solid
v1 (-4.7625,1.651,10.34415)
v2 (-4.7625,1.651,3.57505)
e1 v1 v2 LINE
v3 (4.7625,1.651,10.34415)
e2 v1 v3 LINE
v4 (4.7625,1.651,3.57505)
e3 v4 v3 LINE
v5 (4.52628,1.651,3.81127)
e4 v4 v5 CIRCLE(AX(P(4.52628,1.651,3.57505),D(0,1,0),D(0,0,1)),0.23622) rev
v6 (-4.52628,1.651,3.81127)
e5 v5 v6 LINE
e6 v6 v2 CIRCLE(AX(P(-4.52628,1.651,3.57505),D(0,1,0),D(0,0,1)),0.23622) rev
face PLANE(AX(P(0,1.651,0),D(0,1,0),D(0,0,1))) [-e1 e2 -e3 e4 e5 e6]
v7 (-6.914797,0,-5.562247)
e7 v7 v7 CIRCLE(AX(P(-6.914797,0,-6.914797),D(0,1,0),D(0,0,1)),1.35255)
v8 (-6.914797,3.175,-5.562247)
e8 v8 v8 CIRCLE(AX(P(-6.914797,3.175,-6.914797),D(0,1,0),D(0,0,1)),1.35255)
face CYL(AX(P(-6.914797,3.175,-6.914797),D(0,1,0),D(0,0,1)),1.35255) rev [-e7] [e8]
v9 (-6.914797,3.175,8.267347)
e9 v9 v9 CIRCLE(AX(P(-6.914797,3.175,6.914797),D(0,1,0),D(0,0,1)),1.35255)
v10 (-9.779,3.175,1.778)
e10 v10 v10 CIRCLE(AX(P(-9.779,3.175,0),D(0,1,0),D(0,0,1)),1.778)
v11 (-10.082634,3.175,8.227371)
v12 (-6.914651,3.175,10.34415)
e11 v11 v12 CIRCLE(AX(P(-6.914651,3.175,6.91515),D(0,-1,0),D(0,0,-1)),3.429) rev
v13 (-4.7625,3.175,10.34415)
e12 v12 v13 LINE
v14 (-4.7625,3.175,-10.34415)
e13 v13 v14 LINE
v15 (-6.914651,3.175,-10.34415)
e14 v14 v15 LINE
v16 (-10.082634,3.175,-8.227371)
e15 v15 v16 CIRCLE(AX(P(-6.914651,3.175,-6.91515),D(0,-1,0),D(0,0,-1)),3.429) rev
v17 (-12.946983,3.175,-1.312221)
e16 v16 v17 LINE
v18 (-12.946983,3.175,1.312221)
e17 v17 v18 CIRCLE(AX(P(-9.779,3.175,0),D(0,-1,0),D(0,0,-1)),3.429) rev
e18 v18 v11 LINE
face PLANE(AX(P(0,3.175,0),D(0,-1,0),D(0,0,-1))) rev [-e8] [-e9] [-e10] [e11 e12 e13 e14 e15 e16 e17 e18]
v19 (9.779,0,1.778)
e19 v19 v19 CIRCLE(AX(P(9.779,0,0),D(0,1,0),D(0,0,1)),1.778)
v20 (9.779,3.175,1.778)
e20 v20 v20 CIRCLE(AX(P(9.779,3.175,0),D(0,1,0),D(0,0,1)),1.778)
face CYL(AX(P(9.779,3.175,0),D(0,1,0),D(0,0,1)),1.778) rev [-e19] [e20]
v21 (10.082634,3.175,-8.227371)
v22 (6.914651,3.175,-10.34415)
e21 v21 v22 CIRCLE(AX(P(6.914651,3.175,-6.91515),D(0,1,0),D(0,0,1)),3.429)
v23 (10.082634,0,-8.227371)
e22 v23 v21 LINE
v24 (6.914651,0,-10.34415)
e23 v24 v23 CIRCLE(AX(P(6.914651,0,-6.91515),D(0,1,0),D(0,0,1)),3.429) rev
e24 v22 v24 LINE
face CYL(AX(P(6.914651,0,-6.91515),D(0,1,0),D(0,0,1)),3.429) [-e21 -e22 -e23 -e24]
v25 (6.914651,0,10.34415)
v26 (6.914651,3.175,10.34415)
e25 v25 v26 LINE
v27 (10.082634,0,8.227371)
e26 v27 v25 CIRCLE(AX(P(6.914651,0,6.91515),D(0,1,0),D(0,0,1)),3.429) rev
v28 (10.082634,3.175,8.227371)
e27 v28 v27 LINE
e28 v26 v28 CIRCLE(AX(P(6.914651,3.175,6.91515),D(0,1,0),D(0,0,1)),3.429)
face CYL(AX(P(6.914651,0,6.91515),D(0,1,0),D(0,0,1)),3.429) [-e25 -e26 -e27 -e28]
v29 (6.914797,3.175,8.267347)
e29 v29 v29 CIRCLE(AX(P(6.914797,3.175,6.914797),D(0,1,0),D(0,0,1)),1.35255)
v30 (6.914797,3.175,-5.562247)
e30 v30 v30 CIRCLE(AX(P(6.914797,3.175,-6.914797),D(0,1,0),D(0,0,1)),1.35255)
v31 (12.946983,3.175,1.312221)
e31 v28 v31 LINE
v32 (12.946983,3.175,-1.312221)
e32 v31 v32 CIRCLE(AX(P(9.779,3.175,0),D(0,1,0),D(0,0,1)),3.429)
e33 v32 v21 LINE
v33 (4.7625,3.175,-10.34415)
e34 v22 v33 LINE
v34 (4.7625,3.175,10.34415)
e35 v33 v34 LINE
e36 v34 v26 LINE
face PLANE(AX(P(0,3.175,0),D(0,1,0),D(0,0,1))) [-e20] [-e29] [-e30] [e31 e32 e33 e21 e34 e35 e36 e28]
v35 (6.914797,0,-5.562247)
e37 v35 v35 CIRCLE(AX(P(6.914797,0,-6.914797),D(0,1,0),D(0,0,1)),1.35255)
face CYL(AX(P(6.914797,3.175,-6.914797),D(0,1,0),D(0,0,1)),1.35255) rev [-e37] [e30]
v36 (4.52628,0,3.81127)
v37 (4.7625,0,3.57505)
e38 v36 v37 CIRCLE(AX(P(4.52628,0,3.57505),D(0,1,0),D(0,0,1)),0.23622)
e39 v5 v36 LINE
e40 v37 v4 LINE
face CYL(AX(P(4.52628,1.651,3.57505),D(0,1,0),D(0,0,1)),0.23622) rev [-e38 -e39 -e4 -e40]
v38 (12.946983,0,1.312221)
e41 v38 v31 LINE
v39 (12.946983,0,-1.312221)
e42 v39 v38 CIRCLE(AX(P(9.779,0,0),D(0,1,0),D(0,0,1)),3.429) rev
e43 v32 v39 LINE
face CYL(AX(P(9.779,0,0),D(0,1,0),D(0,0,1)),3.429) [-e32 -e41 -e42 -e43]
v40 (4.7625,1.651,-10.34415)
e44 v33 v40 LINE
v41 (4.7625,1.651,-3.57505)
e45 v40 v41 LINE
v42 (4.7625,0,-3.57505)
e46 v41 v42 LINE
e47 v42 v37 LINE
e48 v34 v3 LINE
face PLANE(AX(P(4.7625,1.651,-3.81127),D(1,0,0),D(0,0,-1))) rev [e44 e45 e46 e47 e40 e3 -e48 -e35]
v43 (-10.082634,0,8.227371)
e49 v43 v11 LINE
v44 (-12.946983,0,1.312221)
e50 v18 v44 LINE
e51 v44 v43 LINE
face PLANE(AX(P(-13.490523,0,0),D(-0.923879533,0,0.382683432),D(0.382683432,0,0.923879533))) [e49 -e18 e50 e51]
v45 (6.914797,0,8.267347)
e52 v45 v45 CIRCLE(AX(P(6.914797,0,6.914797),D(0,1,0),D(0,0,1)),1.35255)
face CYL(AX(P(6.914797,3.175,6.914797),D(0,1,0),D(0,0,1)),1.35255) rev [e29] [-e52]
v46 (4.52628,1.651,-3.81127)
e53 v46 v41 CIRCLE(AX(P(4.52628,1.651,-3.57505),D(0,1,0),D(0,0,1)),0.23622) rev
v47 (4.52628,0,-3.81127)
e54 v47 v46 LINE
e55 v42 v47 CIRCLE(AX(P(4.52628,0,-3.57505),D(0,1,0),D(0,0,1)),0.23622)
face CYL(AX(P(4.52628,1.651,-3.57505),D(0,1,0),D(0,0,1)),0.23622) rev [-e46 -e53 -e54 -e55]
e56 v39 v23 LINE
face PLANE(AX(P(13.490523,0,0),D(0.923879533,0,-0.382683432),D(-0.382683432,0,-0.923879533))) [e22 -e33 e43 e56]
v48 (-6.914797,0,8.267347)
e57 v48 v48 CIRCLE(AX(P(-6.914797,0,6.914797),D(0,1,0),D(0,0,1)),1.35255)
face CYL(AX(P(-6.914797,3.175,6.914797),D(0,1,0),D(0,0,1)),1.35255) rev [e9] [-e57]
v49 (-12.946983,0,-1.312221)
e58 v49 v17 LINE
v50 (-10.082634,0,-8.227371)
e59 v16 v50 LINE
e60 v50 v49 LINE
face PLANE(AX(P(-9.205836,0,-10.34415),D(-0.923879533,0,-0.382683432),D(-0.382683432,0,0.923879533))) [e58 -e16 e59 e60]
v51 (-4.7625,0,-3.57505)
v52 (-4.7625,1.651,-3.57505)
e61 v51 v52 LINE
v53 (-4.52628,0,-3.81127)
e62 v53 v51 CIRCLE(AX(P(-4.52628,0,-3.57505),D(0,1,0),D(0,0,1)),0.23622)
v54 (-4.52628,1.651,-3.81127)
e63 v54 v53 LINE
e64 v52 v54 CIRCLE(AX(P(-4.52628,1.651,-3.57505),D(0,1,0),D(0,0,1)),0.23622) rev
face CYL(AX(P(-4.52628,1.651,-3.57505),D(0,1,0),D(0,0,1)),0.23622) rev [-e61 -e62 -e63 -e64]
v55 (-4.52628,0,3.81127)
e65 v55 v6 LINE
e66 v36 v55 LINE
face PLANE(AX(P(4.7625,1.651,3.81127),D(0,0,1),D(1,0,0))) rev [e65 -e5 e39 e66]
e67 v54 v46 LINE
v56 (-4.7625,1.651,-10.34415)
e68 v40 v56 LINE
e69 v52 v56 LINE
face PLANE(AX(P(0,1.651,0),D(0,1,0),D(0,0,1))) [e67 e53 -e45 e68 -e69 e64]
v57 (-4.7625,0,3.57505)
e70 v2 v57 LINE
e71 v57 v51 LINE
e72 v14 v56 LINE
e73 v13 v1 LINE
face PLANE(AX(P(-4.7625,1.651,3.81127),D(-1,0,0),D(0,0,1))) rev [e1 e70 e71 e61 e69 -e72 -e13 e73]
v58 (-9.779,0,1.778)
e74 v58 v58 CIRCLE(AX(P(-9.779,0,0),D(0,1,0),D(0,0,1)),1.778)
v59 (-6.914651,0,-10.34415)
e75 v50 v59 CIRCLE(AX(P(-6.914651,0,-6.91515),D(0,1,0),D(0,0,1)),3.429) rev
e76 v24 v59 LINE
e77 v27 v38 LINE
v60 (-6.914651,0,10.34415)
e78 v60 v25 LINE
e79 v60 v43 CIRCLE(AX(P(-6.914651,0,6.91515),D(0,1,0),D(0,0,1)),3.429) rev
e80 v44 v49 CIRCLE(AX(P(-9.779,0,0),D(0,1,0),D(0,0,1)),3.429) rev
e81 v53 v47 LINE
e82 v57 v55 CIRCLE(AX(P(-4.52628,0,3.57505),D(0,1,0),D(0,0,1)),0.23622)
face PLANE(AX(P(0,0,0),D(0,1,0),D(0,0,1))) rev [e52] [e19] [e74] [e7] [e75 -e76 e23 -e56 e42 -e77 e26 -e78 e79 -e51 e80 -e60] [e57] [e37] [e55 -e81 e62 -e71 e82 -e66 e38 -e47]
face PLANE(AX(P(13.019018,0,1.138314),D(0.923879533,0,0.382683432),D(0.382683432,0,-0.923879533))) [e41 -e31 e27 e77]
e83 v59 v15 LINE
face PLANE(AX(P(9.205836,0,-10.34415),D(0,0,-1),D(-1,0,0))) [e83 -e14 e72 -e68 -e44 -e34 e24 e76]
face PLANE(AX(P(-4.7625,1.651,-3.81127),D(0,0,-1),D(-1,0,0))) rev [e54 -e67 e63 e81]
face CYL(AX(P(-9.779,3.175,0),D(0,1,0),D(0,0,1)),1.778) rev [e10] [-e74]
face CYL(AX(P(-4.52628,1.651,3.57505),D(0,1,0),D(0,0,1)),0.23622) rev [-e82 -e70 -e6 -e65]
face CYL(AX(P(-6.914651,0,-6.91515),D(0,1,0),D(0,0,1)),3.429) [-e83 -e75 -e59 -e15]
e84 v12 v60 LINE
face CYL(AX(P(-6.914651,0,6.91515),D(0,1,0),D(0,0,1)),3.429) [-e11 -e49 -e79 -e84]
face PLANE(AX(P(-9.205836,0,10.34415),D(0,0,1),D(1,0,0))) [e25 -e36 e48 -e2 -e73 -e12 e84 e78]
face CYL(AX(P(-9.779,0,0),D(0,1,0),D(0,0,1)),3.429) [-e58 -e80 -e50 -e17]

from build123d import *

# Parameters (mm, degrees)
BOSS_EXTRUDE1_DEPTH    = 1.651
SKETCH2_W              = 9.525
SKETCH2_H              = 7.62254
CUT_EXTRUDE1_DEPTH     = 18.079855009
BOSS_EXTRUDE2_DEPTH    = 1.524
BOSS_EXTRUDE3_DEPTH    = 1.524
DRAFT1_DEPTH           = 3.175
DRAFT1_2_DEPTH         = 1.651
M2_5_CLEARANCE_HOLE1_D = 2.7051
M3_CLEARANCE_HOLE1_D   = 3.556
FILLET1_R              = 0.23622
FILLET2_R              = 3.429


# Read off the part's stored shape, not the designer's step: Draft1
with BuildPart() as part:
    # Sketch1 → Boss-Extrude1 (new body)
    with BuildSketch(Plane(origin=(0, 1.651, 0), x_dir=(1, 0, 0), z_dir=(0, 1, 0))):
        Polygon((13.490522855, 0), (9.205835634, 10.34415), (-9.205835634, 10.34415), (-13.490522855, 0), (-9.205835634, -10.34415), (13.019017606, -1.138314366), align=None)
    extrude(amount=-BOSS_EXTRUDE1_DEPTH)

    # Sketch2 → Cut-Extrude1 (cut, through all)
    with BuildSketch(Plane.XZ):
        Rectangle(SKETCH2_W, SKETCH2_H)
    extrude(amount=-CUT_EXTRUDE1_DEPTH, mode=Mode.SUBTRACT)

    # Sketch3 → Boss-Extrude2 (add)
    with BuildSketch(Plane(origin=(0, 1.651, 0), x_dir=(-1, 0, 0), z_dir=(0, 1, 0))):
        Polygon((-9.205835634, -10.34415), (-13.490522855, 0), (-13.019017606, 1.138314366), (-4.7625, 4.558275937), (-4.7625, -10.34415), align=None)
    extrude(amount=BOSS_EXTRUDE2_DEPTH)

    # Sketch4 → Boss-Extrude3 (add)
    with BuildSketch(Plane(origin=(0, 1.651, 0), x_dir=(-1, 0, 0), z_dir=(0, 1, 0))):
        Polygon((9.205835634, 10.34415), (13.490522855, 0), (9.205835634, -10.34415), (4.7625, -10.34415), (4.7625, 8.503660118), align=None)
    extrude(amount=BOSS_EXTRUDE3_DEPTH)

    # Draft1 outline → Draft1 (add)
    with BuildSketch(Plane(origin=(0, 0, 0), x_dir=(1, 0, 0), z_dir=(0, 1, 0))):
        Polygon((4.7625, -10.34415), (9.205835634, -10.34415), (13.019017606, -1.138314366), (4.7625, -4.558275937), align=None)
        Polygon((-9.205835634, -10.34415), (-4.7625, -10.34415), (-4.7625, -8.503660118), align=None)
    extrude(amount=DRAFT1_DEPTH)

    # Draft1 2 outline → Draft1 2 (add)
    with BuildSketch(Plane(origin=(0, 0, 0), x_dir=(1, 0, 0), z_dir=(0, 1, 0))):
        Polygon((-4.7625, -10.34415), (4.7625, -10.34415), (4.7625, -4.558275937), (-4.7625, -8.503660118), align=None)
    extrude(amount=DRAFT1_2_DEPTH)

    # M2.5 Clearance Hole1 (through all)
    with Locations(Plane(origin=(0, 3.175, 0), x_dir=(1, 0, 0), z_dir=(0, 1, 0))):
        with Locations((6.914797213, 6.914797213), (-6.914797213, 6.914797213), (-6.914797213, -6.914797213), (6.914797213, -6.914797213)):
            Hole(M2_5_CLEARANCE_HOLE1_D / 2)

    # M3 Clearance Hole1 (through all)
    with Locations(Plane(origin=(0, 3.175, 0), x_dir=(1, 0, 0), z_dir=(0, 1, 0))):
        with Locations((9.779, 0), (-9.779, 0)):
            Hole(M3_CLEARANCE_HOLE1_D / 2)

    # Fillet1
    fillet1_edges = [part.edges().sort_by_distance(p)[0] for p in [
        (4.7625, 0.8255, 3.81127),
        (4.7625, 0.8255, -3.81127),
        (-4.7625, 0.8255, -3.81127),
        (-4.7625, 0.8255, 3.81127),
    ]]
    fillet(fillet1_edges, radius=FILLET1_R)

    # Fillet2
    fillet2_edges = [part.edges().sort_by_distance(p)[0] for p in [
        (9.205835634, 1.5875, 10.34415),
        (-9.205835634, 1.5875, 10.34415),
        (-13.490522855, 1.5875, 0),
        (-9.205835634, 1.5875, -10.34415),
        (9.205835634, 1.5875, -10.34415),
        (13.490522855, 1.5875, 0),
    ]]
    fillet(fillet2_edges, radius=FILLET2_R)


solid = part.part
